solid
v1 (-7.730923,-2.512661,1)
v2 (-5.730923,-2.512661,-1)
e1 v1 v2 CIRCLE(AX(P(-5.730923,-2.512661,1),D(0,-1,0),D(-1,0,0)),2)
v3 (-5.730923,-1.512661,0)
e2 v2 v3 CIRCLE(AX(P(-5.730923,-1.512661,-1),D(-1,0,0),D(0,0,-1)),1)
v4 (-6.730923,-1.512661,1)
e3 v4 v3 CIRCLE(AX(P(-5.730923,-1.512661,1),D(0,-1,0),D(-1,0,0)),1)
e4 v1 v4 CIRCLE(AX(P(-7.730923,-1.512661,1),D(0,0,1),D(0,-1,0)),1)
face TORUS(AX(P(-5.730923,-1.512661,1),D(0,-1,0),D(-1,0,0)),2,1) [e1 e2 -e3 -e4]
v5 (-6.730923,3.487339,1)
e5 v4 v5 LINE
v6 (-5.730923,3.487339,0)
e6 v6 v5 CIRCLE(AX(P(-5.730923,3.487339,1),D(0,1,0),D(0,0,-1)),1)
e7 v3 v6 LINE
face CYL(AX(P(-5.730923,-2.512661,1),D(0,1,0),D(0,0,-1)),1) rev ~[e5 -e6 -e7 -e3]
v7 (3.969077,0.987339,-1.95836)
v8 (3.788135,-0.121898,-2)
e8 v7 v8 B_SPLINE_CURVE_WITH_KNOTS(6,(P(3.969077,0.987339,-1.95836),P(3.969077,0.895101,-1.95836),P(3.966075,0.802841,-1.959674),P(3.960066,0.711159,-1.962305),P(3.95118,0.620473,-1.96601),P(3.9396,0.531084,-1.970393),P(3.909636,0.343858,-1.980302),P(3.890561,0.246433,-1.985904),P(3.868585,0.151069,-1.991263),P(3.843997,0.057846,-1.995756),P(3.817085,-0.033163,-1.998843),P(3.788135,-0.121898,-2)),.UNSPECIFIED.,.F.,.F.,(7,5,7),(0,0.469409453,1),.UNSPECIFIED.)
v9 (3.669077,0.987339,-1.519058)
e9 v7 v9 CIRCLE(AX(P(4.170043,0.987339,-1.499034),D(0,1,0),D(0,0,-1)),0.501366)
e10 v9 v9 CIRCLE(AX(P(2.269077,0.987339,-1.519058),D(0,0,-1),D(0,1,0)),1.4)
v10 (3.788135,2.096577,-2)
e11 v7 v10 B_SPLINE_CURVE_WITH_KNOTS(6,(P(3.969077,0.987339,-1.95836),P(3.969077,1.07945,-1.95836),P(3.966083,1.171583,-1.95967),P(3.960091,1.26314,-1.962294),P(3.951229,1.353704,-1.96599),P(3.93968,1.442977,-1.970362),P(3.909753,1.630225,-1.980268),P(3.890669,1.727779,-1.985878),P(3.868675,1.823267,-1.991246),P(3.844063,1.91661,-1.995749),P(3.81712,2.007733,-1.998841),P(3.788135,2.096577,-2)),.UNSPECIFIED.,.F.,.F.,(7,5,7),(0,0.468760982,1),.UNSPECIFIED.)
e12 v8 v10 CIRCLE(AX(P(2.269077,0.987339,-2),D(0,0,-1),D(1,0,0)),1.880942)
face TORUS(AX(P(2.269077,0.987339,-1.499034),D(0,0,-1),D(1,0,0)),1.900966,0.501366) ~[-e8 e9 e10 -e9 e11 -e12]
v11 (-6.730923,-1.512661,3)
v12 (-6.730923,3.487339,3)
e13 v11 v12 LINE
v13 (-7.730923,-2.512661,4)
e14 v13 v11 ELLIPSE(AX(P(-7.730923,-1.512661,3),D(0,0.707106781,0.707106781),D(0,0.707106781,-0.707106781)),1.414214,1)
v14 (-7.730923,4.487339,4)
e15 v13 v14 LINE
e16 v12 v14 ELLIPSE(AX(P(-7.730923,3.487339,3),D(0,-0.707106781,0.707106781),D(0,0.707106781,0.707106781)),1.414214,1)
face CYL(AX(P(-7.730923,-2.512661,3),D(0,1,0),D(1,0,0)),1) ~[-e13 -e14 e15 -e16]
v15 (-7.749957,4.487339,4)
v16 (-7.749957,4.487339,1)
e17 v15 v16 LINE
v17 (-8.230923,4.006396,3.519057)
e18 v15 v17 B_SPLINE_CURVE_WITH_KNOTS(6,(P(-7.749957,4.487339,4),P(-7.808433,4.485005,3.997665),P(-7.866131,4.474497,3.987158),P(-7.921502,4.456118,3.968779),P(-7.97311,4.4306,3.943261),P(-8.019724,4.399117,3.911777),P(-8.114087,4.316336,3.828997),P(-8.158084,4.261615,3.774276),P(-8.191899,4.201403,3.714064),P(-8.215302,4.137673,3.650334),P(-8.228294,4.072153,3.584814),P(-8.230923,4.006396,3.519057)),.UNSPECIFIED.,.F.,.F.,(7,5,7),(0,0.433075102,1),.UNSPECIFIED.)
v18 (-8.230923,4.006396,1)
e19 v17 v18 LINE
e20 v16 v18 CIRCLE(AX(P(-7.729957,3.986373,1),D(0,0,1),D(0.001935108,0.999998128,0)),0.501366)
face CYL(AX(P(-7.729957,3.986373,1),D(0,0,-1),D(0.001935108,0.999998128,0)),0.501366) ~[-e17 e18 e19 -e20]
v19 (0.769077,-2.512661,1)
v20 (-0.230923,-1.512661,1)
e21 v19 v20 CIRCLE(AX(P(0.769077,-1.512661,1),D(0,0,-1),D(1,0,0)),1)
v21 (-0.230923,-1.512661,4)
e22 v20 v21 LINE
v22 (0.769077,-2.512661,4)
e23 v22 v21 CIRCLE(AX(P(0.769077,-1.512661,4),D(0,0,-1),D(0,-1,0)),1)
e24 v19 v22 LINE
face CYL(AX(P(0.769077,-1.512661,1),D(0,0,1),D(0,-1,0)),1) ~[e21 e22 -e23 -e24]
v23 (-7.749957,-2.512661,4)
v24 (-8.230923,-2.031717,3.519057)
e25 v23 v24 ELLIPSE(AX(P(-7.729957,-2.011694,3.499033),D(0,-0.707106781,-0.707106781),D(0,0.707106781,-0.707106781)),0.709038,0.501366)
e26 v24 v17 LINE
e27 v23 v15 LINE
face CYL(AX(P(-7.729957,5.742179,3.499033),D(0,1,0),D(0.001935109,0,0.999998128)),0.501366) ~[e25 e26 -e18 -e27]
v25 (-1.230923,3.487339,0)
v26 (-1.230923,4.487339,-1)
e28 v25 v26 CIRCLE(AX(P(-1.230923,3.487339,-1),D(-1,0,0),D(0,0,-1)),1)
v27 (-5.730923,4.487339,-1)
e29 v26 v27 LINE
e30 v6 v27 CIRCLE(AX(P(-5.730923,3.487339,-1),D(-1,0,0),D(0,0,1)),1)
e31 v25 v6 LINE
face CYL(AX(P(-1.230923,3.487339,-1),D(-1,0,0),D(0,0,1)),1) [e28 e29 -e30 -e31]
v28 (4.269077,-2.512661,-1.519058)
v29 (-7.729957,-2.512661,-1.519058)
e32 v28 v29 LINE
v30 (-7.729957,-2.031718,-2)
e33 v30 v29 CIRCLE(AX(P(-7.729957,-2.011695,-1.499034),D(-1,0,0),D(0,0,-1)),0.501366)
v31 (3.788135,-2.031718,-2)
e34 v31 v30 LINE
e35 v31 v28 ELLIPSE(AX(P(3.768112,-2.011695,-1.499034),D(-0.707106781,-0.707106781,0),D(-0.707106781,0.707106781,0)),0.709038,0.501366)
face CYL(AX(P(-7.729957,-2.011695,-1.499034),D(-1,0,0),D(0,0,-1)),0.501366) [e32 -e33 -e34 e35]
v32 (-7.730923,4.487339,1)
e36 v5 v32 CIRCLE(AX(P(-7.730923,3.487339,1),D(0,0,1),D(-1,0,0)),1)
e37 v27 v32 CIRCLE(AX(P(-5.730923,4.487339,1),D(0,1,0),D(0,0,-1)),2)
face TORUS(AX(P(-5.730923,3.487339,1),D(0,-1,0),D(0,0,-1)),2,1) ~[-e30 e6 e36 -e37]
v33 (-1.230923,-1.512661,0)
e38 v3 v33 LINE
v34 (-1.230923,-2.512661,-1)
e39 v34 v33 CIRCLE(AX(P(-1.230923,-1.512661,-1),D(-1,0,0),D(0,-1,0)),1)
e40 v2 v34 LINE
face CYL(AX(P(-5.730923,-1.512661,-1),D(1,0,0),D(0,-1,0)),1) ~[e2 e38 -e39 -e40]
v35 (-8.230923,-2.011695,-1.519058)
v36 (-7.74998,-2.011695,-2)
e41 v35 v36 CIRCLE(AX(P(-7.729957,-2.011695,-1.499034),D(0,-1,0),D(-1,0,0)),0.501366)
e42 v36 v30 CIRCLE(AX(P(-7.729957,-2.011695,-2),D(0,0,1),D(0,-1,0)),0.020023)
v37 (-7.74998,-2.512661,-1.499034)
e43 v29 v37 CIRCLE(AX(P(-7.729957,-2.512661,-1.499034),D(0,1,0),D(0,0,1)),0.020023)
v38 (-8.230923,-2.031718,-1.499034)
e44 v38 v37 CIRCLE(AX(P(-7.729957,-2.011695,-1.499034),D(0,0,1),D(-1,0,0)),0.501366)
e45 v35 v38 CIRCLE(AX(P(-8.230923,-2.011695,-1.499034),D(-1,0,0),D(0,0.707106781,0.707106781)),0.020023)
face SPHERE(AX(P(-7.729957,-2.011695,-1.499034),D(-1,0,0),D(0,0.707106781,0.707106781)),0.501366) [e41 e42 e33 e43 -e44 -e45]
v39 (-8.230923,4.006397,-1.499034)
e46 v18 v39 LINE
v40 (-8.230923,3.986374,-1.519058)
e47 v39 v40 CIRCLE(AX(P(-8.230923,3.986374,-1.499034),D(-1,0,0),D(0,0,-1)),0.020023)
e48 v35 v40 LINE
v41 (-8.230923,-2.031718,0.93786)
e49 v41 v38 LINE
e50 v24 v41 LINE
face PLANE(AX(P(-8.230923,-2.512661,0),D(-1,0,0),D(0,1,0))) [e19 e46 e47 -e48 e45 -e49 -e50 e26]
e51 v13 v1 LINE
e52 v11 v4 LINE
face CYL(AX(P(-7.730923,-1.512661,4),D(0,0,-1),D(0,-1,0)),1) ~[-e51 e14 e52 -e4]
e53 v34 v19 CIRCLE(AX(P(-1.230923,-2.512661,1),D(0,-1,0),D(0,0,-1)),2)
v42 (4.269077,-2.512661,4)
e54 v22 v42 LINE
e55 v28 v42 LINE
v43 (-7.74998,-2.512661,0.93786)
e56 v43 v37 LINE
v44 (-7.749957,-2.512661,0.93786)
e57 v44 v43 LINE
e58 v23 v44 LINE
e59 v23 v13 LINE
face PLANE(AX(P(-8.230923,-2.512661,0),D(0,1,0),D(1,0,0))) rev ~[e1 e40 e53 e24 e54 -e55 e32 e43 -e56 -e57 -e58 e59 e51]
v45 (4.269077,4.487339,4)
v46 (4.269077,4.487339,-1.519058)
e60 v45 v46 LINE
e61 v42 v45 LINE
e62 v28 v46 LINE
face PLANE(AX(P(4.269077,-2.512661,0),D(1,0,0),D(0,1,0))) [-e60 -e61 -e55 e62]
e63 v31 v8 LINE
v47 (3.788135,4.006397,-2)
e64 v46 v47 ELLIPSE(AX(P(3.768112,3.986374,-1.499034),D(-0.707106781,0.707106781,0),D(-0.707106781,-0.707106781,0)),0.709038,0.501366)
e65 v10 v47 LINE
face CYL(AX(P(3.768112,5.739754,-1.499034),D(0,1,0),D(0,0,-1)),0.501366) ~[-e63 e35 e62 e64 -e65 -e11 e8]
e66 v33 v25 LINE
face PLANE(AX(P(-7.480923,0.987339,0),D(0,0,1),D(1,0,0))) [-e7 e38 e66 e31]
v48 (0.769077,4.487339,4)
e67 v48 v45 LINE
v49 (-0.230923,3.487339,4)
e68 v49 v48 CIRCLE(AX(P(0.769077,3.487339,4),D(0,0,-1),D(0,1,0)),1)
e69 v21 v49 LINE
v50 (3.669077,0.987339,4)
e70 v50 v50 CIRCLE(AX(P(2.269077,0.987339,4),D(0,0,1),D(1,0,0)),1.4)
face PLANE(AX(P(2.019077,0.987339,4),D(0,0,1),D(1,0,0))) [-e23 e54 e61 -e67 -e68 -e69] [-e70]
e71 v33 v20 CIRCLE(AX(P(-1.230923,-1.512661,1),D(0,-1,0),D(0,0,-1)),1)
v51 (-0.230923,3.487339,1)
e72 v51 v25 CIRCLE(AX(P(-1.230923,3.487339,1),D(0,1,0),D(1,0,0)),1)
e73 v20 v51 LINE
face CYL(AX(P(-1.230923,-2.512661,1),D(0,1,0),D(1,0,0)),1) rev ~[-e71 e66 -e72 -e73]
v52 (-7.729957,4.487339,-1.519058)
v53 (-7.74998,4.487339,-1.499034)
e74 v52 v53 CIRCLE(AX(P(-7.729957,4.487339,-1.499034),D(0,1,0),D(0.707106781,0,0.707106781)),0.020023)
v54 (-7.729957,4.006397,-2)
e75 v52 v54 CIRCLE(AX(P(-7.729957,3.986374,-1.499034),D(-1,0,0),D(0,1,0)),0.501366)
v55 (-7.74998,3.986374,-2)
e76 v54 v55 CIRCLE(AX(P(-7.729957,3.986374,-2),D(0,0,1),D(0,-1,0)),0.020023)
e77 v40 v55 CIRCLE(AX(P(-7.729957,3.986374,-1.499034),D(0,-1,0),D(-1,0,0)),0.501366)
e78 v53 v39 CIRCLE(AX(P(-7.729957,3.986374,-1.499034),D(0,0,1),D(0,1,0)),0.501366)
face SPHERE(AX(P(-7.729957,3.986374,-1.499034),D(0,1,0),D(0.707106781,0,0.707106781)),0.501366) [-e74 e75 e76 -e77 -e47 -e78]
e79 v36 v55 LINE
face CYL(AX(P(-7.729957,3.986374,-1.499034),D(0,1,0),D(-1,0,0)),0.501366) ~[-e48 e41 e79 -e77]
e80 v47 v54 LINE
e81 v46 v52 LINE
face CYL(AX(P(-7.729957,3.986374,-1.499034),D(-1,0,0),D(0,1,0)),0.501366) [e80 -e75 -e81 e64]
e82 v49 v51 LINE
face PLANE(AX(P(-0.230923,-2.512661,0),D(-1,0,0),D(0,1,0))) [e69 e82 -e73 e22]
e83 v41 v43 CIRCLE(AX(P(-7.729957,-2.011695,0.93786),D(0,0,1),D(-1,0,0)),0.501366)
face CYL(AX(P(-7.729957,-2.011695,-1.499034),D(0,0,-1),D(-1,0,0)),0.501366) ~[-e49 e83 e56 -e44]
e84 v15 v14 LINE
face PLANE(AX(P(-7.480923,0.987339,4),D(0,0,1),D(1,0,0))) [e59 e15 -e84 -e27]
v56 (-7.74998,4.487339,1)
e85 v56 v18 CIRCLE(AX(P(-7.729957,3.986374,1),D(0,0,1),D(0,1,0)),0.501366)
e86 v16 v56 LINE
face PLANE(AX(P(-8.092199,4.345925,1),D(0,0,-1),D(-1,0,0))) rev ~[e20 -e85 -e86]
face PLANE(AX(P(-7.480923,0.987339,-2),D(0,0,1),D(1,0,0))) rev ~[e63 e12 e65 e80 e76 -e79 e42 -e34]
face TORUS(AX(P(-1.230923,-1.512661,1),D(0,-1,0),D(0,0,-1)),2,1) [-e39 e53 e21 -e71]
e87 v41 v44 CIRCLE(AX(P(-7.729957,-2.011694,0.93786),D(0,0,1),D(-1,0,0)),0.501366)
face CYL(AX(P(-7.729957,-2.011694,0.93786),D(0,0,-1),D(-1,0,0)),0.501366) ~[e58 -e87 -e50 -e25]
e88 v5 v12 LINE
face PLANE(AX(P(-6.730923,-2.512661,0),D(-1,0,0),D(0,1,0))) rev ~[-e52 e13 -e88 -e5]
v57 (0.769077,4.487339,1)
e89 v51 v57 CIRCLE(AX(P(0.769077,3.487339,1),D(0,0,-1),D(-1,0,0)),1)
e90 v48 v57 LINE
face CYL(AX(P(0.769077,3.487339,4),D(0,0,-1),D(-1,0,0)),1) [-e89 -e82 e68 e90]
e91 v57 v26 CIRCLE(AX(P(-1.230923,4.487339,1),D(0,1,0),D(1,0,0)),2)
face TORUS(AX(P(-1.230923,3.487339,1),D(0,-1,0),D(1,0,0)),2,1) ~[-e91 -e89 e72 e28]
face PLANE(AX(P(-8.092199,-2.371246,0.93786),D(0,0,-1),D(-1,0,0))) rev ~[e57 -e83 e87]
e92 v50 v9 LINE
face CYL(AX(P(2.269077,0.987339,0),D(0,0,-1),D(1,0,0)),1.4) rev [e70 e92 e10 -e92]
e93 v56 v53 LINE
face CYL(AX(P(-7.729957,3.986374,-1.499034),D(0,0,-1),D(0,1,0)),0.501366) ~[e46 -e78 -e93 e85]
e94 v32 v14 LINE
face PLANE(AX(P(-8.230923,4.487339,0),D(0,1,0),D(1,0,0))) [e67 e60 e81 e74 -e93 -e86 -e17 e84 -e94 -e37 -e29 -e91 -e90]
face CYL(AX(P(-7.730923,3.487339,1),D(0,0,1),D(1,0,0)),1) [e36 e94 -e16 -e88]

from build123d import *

# Parameters (mm, degrees)
F0_W         = 1.5
F0_H         = 7
F0_W_2       = 6.5
F0_W_3       = 4.5
F0_R         = 1.4
F1_DEPTH     = 2
F2_DEPTH     = 4
F3_F1_R      = 1
F3_F2_R      = 1
F4_T1_DEPTH  = 5.9980686292
F4_T3_DEPTH  = 13.2514489274
F4_T5_DEPTH  = 9.5048292256
F4_T7_DEPTH  = 2.4368940733
F4_T9_DEPTH  = 4.3169803418
F4_T11_DEPTH = 9.509680201
F4_T13_DEPTH = 4.2548401974
F4_T15_DEPTH = 2.4990342177
F4_S19_W     = 0.551502254
F4_S19_H     = 0.5515022539
F4_T20_DEPTH = 0.551502254
F4_S25_W     = 0.551502254
F4_S25_H     = 0.5515022539
F4_T26_DEPTH = 0.551502254


# Not quite as in the source:
# - a fillet or chamfer that OpenCascade refuses, or shapes differently, is made with other operations: its cross-section is extruded or revolved along the edge and cut away or added


with BuildPart() as f1:
    # F0 (on Top) → F1 (new body)
    with BuildSketch(Plane.XY):
        with Locations((-7.4809225276, 0.9873391916)):
            Rectangle(F0_W, F0_H)
        with Locations((-3.4809225276, 0.9873391916)):
            Rectangle(F0_W_2, F0_H)
        with Locations((2.0190774724, 0.9873391916)):
            Rectangle(F0_W_3, F0_H)
        with Locations((2.2690774724, 0.9873391916)):
            Circle(F0_R, mode=Mode.SUBTRACT)
    extrude(amount=-F1_DEPTH)

    # F0 (on Top) → F2 (join)
    with BuildSketch(Plane.XY):
        with Locations((-7.4809225276, 0.9873391916)):
            Rectangle(F0_W, F0_H)
        with Locations((2.0190774724, 0.9873391916)):
            Rectangle(F0_W_3, F0_H)
        with Locations((2.2690774724, 0.9873391916)):
            Circle(F0_R, mode=Mode.SUBTRACT)
    extrude(amount=F2_DEPTH)

    # F3: fillet of radius 1 on 7 edges, made by hand

    # F3_f1
    f3_f1_edges = [f1.edges().sort_by_distance(p)[0] for p in [
        (-0.2309225276, 0.9873391916, 0),
        (-6.7309225276, 0.9873391916, 0),
    ]]
    fillet(f3_f1_edges, radius=F3_F1_R)

    # F3_f2
    f3_f2_edges = [f1.edges().sort_by_distance(p)[0] for p in [
        (-3.4809225276, 4.4873391916, 0),
        (-3.4809225276, -2.5126608084, 0),
        (-6.7309225276, -2.5126608084, 2.5),
        (-6.7309225276, 4.4873391916, 2.5),
        (-6.7309225276, 0.9873391916, 4),
        (-6.4380293088, 4.4873391916, 0.2928932188),
        (-6.4380293088, -2.5126608084, 0.2928932188),
        (-0.5238157464, -2.5126608084, 0.2928932188),
        (-0.5238157464, 4.4873391916, 0.2928932188),
    ]]
    fillet(f3_f2_edges, radius=F3_F2_R)

    # F4: fillet of radius 0.5 on 8 edges, made by hand

    # F4_s2 → F4_t1 (cut)
    with BuildSketch(Plane.XZ.offset(-3.9863735062)):
        with BuildLine():
            ThreePointArc((-8.2313225276, -1.4990343146), (-8.0844759182, -1.8535533906), (-7.7299568422, -2.0004))
            Line((-7.7299568422, -2.0004), (-7.7299568422, -2.0505365685))
            ThreePointArc((-7.7299568422, -2.0505365685), (-7.9804396849, -2.0501365685), (-8.2309225276, -2.0501365685))
            Line((-8.2309225276, -2.0501365685), (-8.2810590962, -2))
            ThreePointArc((-8.2810590962, -2), (-8.2810590962, -1.7495171573), (-8.2814590962, -1.4990343146))
            Line((-8.2814590962, -1.4990343146), (-8.2313225276, -1.4990343146))
        make_face()
    extrude(amount=F4_T1_DEPTH, mode=Mode.SUBTRACT)

    # F4_s4 → F4_t3 (cut)
    with BuildSketch(Plane.YZ.offset(-7.7299568422)):
        with BuildLine():
            ThreePointArc((-2.011695123, -2.0004), (-2.366214199, -1.8535533906), (-2.5130608084, -1.4990343146))
            Line((-2.5130608084, -1.4990343146), (-2.563197377, -1.4990343146))
            ThreePointArc((-2.563197377, -1.4990343146), (-2.562797377, -1.7495171573), (-2.562797377, -2))
            Line((-2.562797377, -2), (-2.5126608084, -2.0501365685))
            ThreePointArc((-2.5126608084, -2.0501365685), (-2.2621779657, -2.0501365685), (-2.011695123, -2.0505365685))
            Line((-2.011695123, -2.0505365685), (-2.011695123, -2.0004))
        make_face()
        with BuildLine():
            ThreePointArc((4.4877391916, -1.4990343146), (4.3408925822, -1.8535533906), (3.9863735062, -2.0004))
            Line((3.9863735062, -2.0004), (3.9863735062, -2.0505365685))
            ThreePointArc((3.9863735062, -2.0505365685), (4.2368563489, -2.0501365685), (4.4873391916, -2.0501365685))
            Line((4.4873391916, -2.0501365685), (4.5374757601, -2))
            ThreePointArc((4.5374757601, -2), (4.5374757601, -1.7495171573), (4.5378757601, -1.4990343146))
            Line((4.5378757601, -1.4990343146), (4.4877391916, -1.4990343146))
        make_face()
    extrude(amount=F4_T3_DEPTH, mode=Mode.SUBTRACT)

    # F4_s6 → F4_t5 (cut)
    with BuildSketch(Plane.XZ.offset(-5.7397538044)):
        with BuildLine():
            ThreePointArc((3.768111787, -2.0004), (4.122630863, -1.8535533906), (4.2694774724, -1.4990343146))
            Line((4.2694774724, -1.4990343146), (4.3196140409, -1.4990343146))
            ThreePointArc((4.3196140409, -1.4990343146), (4.3192140409, -1.7495171573), (4.3192140409, -2))
            Line((4.3192140409, -2), (4.2690774724, -2.0501365685))
            ThreePointArc((4.2690774724, -2.0501365685), (4.0185946297, -2.0501365685), (3.768111787, -2.0505365685))
            Line((3.768111787, -2.0505365685), (3.768111787, -2.0004))
        make_face()
    extrude(amount=F4_T5_DEPTH, mode=Mode.SUBTRACT)

    # F4_s8 → F4_t7 (cut)
    with BuildSketch(Plane.XY.offset(-1.4990343146)):
        with BuildLine():
            ThreePointArc((-8.2313225276, -2.011695123), (-8.0844759182, -2.366214199), (-7.7299568422, -2.5130608084))
            Line((-7.7299568422, -2.5130608084), (-7.7299568422, -2.563197377))
            ThreePointArc((-7.7299568422, -2.563197377), (-7.9804396849, -2.562797377), (-8.2309225276, -2.562797377))
            Line((-8.2309225276, -2.562797377), (-8.2810590962, -2.5126608084))
            ThreePointArc((-8.2810590962, -2.5126608084), (-8.2810590962, -2.2621779657), (-8.2814590962, -2.011695123))
            Line((-8.2814590962, -2.011695123), (-8.2313225276, -2.011695123))
        make_face()
    extrude(amount=F4_T7_DEPTH, mode=Mode.SUBTRACT)

    # F4_s10 → F4_t9 (cut)
    with BuildSketch(Plane.XY.offset(0.9378597587)):
        with BuildLine():
            ThreePointArc((-8.2313225276, -2.0116941886), (-8.0841327357, -2.3665561153), (-7.7289866453, -2.5130589353))
            Line((-7.7289866453, -2.5130589353), (-7.7288896256, -2.56319541))
            ThreePointArc((-7.7288896256, -2.56319541), (-7.7309225276, -2.562797377), (-8.2309225276, -2.562797377))
            Line((-8.2309225276, -2.562797377), (-8.2810590962, -2.5126608084))
            ThreePointArc((-8.2810590962, -2.5126608084), (-8.2810590962, -2.2621774985), (-8.2814590962, -2.0116941886))
            Line((-8.2814590962, -2.0116941886), (-8.2313225276, -2.0116941886))
        make_face()
    extrude(amount=F4_T9_DEPTH, mode=Mode.SUBTRACT)

    # F4_s12 → F4_t11 (cut)
    with BuildSketch(Plane.XZ.offset(-5.7421792921)):
        with BuildLine():
            ThreePointArc((-7.7289866453, 4.0003981269), (-8.0841327357, 3.8538953069), (-8.2313225276, 3.4990333802))
            Line((-8.2313225276, 3.4990333802), (-8.2814590962, 3.4990333802))
            ThreePointArc((-8.2814590962, 3.4990333802), (-8.2810590962, 3.7495166901), (-8.2810590962, 4))
            Line((-8.2810590962, 4), (-8.2309225276, 4.0501365685))
            ThreePointArc((-8.2309225276, 4.0501365685), (-7.7309225276, 4.0501365685), (-7.7288896256, 4.0505346016))
            Line((-7.7288896256, 4.0505346016), (-7.7289866453, 4.0003981269))
        make_face()
    extrude(amount=F4_T11_DEPTH, mode=Mode.SUBTRACT)

    # F4_s14 → F4_t13 (cut)
    with BuildSketch(Plane.XY.offset(0.9999999031)):
        with BuildLine():
            ThreePointArc((-7.7289866453, 4.4877373185), (-8.0841327357, 4.3412344984), (-8.2313225276, 3.9863725718))
            Line((-8.2313225276, 3.9863725718), (-8.2814590962, 3.9863725718))
            ThreePointArc((-8.2814590962, 3.9863725718), (-8.2810590962, 4.2368558817), (-8.2810590962, 4.4873391916))
            Line((-8.2810590962, 4.4873391916), (-8.2309225276, 4.5374757601))
            ThreePointArc((-8.2309225276, 4.5374757601), (-7.7309225276, 4.5374757601), (-7.7288896256, 4.5378737932))
            Line((-7.7288896256, 4.5378737932), (-7.7289866453, 4.4877373185))
        make_face()
    extrude(amount=F4_T13_DEPTH, mode=Mode.SUBTRACT)

    # F4_s16 → F4_t15 (cut)
    with BuildSketch(Plane.XY.offset(-1.4990343146)):
        with BuildLine():
            ThreePointArc((-7.7299568422, 4.4877391916), (-8.0844759182, 4.3408925822), (-8.2313225276, 3.9863735062))
            Line((-8.2313225276, 3.9863735062), (-8.2814590962, 3.9863735062))
            ThreePointArc((-8.2814590962, 3.9863735062), (-8.2810590962, 4.2368563489), (-8.2810590962, 4.4873391916))
            Line((-8.2810590962, 4.4873391916), (-8.2309225276, 4.5374757601))
            ThreePointArc((-8.2309225276, 4.5374757601), (-7.9804396849, 4.5374757601), (-7.7299568422, 4.5378757601))
            Line((-7.7299568422, 4.5378757601), (-7.7299568422, 4.4877391916))
        make_face()
    extrude(amount=F4_T15_DEPTH, mode=Mode.SUBTRACT)


with BuildPart() as f4_tool18:
    # F4_s19 → F4_t20 (new body)
    with BuildSketch(Plane.XZ.offset(-3.9863735062)):
        with Locations((-8.0057079692, -1.7747854416)):
            Rectangle(F4_S19_W, F4_S19_H)
    extrude(amount=-F4_T20_DEPTH)

    # F4_s21 → F4_t22 (revolve, cut)
    with BuildSketch(Plane(origin=(-7.7299568422, 3.9863735062, -1.4990343146), x_dir=(0.7071067812, 0, 0.7071067812), z_dir=(-0.7071067812, 0, 0.7071067812))):
        with BuildLine():
            ThreePointArc((0, -0.5013656854), (0.5013656854, 0), (0, 0.5013656854))
            Line((0, 0.5013656854), (0, -0.5013656854))
        make_face()
    revolve(axis=Axis((-7.7299568422, 3.9863735062, -1.4990343146), (0, 1, 0)), mode=Mode.SUBTRACT)


with BuildPart() as f1_1:
    add(f1.part)

    # F4_t17: cut F4_tool18
    add(f4_tool18.part, mode=Mode.SUBTRACT)


with BuildPart() as f4_tool24:
    # F4_s25 → F4_t26 (new body)
    with BuildSketch(Plane.YZ.offset(-7.7299568422)):
        with Locations((-2.28744625, -1.7747854416)):
            Rectangle(F4_S25_W, F4_S25_H)
    extrude(amount=-F4_T26_DEPTH)

    # F4_s27 → F4_t28 (revolve, cut)
    with BuildSketch(Plane(origin=(-7.7299568422, -2.011695123, -1.4990343146), x_dir=(0, 0.7071067812, 0.7071067812), z_dir=(0, -0.7071067812, 0.7071067812))):
        with BuildLine():
            ThreePointArc((0, -0.5013656854), (0.5013656854, 0), (0, 0.5013656854))
            Line((0, 0.5013656854), (0, -0.5013656854))
        make_face()
    revolve(axis=Axis((-7.7299568422, -2.011695123, -1.4990343146), (-1, 0, 0)), mode=Mode.SUBTRACT)


with BuildPart() as f1_2:
    add(f1_1.part)

    # F4_t23: cut F4_tool24
    add(f4_tool24.part, mode=Mode.SUBTRACT)

    # F4_s29 → F4_t30 (revolve, cut)
    with BuildSketch(Plane.XZ.offset(-0.9873391916)):
        with BuildLine():
            ThreePointArc((4.1700431578, -2.0004), (3.8155240818, -1.8535533906), (3.6686774724, -1.4990343146))
            Line((3.6686774724, -1.4990343146), (3.6185409038, -1.4990343146))
            ThreePointArc((3.6185409038, -1.4990343146), (3.6189409038, -1.7495171573), (3.6189409038, -2))
            Line((3.6189409038, -2), (3.6690774724, -2.0501365685))
            ThreePointArc((3.6690774724, -2.0501365685), (3.9195603151, -2.0501365685), (4.1700431578, -2.0505365685))
            Line((4.1700431578, -2.0505365685), (4.1700431578, -2.0004))
        make_face()
    revolve(axis=Axis((2.2690774724, 0.9873391916, -2), (0, 0, 1)), mode=Mode.SUBTRACT)


solid = f1_2.part
